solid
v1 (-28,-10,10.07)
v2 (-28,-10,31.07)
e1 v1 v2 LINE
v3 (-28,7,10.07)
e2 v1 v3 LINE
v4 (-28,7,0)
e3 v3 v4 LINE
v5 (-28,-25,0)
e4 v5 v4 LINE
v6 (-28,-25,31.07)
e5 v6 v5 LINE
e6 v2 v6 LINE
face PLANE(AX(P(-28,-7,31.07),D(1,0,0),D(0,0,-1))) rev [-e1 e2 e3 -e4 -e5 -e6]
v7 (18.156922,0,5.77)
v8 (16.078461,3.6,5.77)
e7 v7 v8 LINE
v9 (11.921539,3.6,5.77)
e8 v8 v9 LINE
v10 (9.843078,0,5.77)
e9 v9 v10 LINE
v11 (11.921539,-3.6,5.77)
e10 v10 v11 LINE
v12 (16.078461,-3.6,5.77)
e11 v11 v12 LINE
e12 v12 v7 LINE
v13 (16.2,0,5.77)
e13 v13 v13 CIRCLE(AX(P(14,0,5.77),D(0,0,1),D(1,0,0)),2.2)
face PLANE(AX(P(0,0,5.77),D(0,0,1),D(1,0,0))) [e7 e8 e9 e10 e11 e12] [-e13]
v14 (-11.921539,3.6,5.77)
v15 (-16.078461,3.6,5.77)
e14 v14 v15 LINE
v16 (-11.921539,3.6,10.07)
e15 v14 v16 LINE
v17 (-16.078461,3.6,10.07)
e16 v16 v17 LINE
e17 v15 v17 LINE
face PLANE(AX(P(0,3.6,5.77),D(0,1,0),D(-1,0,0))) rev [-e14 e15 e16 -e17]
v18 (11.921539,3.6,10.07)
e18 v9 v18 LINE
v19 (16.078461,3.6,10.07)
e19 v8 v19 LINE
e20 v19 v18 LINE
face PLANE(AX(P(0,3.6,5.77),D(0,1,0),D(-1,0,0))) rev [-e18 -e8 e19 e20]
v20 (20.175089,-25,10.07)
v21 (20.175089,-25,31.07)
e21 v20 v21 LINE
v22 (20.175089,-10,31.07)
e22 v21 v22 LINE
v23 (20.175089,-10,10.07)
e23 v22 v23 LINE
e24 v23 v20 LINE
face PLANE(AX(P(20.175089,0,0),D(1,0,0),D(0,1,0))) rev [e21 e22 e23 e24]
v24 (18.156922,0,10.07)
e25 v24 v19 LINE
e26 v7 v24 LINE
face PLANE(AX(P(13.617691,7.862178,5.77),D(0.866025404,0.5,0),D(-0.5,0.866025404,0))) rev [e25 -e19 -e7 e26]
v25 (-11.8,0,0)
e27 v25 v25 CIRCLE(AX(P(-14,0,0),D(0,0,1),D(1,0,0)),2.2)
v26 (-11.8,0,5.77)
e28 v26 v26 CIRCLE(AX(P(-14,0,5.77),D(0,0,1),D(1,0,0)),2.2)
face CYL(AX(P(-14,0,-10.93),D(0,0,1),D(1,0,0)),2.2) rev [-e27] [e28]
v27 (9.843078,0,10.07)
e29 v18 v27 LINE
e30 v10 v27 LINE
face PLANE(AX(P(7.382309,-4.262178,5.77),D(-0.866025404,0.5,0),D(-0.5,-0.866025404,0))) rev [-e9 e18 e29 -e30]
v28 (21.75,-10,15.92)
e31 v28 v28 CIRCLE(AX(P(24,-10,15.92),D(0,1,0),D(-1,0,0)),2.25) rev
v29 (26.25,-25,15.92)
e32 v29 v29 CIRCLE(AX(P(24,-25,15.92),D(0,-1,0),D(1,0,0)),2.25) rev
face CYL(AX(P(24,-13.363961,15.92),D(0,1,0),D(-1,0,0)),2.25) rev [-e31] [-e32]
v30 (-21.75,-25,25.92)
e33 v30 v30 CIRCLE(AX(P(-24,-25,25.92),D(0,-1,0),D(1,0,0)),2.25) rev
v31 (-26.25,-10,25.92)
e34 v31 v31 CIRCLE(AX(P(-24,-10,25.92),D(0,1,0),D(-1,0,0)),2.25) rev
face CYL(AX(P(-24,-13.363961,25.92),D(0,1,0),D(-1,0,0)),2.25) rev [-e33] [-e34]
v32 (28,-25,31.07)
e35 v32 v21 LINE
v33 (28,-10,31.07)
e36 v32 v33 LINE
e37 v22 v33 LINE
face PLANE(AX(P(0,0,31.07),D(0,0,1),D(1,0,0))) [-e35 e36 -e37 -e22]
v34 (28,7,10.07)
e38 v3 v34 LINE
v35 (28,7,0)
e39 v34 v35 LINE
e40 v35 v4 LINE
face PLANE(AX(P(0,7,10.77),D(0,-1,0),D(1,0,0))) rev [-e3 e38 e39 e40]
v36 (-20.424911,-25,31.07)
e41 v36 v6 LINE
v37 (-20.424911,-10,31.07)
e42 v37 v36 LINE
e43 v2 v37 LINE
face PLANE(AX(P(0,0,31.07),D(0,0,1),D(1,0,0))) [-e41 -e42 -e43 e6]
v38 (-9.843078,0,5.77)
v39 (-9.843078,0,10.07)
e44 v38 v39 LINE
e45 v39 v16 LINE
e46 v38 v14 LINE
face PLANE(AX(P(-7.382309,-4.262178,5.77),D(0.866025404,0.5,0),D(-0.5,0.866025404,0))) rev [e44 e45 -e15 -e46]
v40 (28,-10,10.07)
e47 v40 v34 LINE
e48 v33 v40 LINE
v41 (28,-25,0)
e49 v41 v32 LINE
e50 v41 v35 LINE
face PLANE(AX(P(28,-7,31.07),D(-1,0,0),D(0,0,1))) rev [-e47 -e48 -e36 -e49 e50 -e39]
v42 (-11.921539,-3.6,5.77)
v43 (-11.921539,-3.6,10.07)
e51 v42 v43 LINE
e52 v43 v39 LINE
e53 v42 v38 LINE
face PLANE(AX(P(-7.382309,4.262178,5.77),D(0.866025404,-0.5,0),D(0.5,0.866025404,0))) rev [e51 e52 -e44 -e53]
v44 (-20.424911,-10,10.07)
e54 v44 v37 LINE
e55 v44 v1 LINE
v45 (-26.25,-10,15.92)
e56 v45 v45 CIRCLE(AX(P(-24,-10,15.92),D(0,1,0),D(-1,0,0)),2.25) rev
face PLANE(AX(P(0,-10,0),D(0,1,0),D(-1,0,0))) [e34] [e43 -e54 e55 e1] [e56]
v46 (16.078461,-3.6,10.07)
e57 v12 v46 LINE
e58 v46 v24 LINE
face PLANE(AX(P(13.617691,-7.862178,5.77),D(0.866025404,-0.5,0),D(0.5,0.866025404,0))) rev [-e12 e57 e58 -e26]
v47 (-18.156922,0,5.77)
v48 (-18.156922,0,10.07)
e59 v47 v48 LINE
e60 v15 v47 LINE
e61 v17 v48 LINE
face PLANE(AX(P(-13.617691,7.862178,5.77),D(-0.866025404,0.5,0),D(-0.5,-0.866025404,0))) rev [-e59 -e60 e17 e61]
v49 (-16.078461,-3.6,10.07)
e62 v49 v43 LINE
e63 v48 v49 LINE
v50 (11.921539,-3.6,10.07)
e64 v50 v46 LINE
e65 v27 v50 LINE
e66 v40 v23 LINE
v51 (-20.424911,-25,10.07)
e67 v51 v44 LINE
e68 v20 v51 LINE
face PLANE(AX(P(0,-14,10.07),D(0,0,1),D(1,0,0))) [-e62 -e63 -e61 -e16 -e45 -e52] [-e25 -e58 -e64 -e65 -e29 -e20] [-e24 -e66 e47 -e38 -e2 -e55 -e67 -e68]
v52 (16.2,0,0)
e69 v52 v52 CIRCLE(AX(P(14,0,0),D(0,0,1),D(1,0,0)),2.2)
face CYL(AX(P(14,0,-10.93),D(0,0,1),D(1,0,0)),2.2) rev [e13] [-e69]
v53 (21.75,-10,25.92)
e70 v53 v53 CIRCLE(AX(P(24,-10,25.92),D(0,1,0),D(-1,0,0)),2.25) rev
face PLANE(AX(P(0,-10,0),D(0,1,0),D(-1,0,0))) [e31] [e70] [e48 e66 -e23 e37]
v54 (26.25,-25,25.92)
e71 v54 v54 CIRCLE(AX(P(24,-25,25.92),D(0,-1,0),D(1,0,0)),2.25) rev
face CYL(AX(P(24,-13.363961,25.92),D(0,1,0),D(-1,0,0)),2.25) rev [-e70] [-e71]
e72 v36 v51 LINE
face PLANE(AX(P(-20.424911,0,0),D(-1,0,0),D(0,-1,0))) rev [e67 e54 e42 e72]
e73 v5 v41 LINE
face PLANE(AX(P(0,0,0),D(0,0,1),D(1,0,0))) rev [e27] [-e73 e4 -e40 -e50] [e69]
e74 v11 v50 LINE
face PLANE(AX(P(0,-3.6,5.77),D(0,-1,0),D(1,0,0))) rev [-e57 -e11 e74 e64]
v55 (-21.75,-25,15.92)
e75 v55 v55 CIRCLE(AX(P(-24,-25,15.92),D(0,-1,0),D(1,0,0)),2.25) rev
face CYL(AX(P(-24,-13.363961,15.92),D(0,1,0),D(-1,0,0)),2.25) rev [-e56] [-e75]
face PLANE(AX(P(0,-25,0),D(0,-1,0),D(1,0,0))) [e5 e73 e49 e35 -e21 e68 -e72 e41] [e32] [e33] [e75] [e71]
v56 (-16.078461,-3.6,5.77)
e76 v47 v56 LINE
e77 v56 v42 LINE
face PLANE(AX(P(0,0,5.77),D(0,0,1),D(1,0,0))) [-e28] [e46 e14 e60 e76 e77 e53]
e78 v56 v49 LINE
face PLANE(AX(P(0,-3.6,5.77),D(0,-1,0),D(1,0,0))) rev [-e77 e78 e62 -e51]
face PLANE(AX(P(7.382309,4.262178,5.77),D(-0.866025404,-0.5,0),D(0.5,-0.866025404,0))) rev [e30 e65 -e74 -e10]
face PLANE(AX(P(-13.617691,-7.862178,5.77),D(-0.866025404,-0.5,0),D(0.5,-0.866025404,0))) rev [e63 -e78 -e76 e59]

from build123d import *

# Parameters (mm, degrees)
SZKIC1_W                       = 40
SZKIC1_H                       = 14
SZKIC1_R                       = 2
DODANIE_WYCI_GNI_CIE1_DEPTH    = 10.77
SZKIC2_W                       = 56
SZKIC2_H                       = 14
DODANIE_WYCI_GNI_CIE2_DEPTH    = 20.3
SZKIC5_R                       = 2.25
WYTNIJ_WYCI_GNI_CIE2_DEPTH     = 14
SZKIC8_W                       = 56
SZKIC8_H                       = 10.77
DODANIE_WYCI_GNI_CIE3_DEPTH    = 14
WYTNIJ_WYCI_GNI_CIE3_START     = -14
WYTNIJ_WYCI_GNI_CIE3_OUTLINE_W = 42
WYTNIJ_WYCI_GNI_CIE3_OUTLINE_H = 21
WYTNIJ_WYCI_GNI_CIE3_DEPTH     = 14
SZKIC12_R                      = 2.25
DODANIE_WYCI_GNI_CIE4_DEPTH    = 18
WYTNIJ_WYCI_GNI_CIE1_DEPTH     = 5
SZKIC9_R                       = 2.2
WYTNIJ_WYCI_GNI_CIE4_DEPTH     = 21
SZKIC10_W                      = 56
SZKIC10_H                      = 21
WYTNIJ_WYCI_GNI_CIE5_DEPTH     = 17
SZKIC13_W                      = 21
SZKIC13_H                      = 15
DODANIE_WYCI_GNI_CIE5_DEPTH    = 0.7
SZKIC16_W                      = 21
SZKIC16_H                      = 15
DODANIE_WYCI_GNI_CIE7_DEPTH    = 0.7


# Read off the part's stored shape, not the designer's step: Wytnij-wyciągnięcie3
with BuildPart() as part:
    # Szkic1 → Dodanie-wyciągnięcie1 (new body)
    with BuildSketch(Plane.XY):
        Rectangle(SZKIC1_W, SZKIC1_H)
        with Locations((-14, 0)):
            Circle(SZKIC1_R, mode=Mode.SUBTRACT)
        with Locations((14, 0)):
            Circle(SZKIC1_R, mode=Mode.SUBTRACT)
    extrude(amount=DODANIE_WYCI_GNI_CIE1_DEPTH)

    # Szkic2 → Dodanie-wyciągnięcie2 (add)
    with BuildSketch(Plane.XY.offset(10.77)):
        Rectangle(SZKIC2_W, SZKIC2_H)
    extrude(amount=DODANIE_WYCI_GNI_CIE2_DEPTH)

    # Szkic5 → Wytnij-wyciągnięcie2 (cut)
    with BuildSketch(Plane(origin=(0, 7, 0), x_dir=(1, 0, 0), z_dir=(0, 1, 0))):
        with Locations(Location((-24, -15.92, 0), (0, 0, 180))):
            Circle(SZKIC5_R)
        with Locations(Location((24, -15.92, 0), (0, 0, 180))):
            Circle(SZKIC5_R)
        with Locations(Location((24, -25.92, 0), (0, 0, 180))):
            Circle(SZKIC5_R)
        with Locations(Location((-24, -25.92, 0), (0, 0, 180))):
            Circle(SZKIC5_R)
    extrude(amount=-WYTNIJ_WYCI_GNI_CIE2_DEPTH, mode=Mode.SUBTRACT)

    # Szkic8 → Dodanie-wyciągnięcie3 (add)
    with BuildSketch(Plane(origin=(0, 7, 0), x_dir=(1, 0, 0), z_dir=(0, 1, 0))):
        with Locations((0, -5.385)):
            Rectangle(SZKIC8_W, SZKIC8_H)
    extrude(amount=-DODANIE_WYCI_GNI_CIE3_DEPTH)

    # Wytnij-wyciągnięcie3 outline → Wytnij-wyciągnięcie3 (cut)
    with BuildSketch(Plane(origin=(0, 7, 0), x_dir=(1, 0, 0), z_dir=(0, 1, 0)).offset(WYTNIJ_WYCI_GNI_CIE3_START)):
        with Locations((-0.124911353, -20.57)):
            Rectangle(WYTNIJ_WYCI_GNI_CIE3_OUTLINE_W, WYTNIJ_WYCI_GNI_CIE3_OUTLINE_H)
    extrude(amount=WYTNIJ_WYCI_GNI_CIE3_DEPTH, mode=Mode.SUBTRACT)

    # Szkic12 → Dodanie-wyciągnięcie4 (add)
    with BuildSketch(Plane.XZ.offset(7)):
        Polygon((20.875088647, 31.07), (20.875088647, 10.07), (-21.124911353, 10.07), (-21.124911353, 31.07), (-28, 31.07), (-28, 0), (28, 0), (28, 31.07), align=None)
        with Locations(Location((-24, 25.92, 0), (0, 0, 180))):
            Circle(SZKIC12_R, mode=Mode.SUBTRACT)
        with Locations(Location((24, 25.92, 0), (0, 0, 180))):
            Circle(SZKIC12_R, mode=Mode.SUBTRACT)
        with Locations(Location((-24, 15.92, 0), (0, 0, 180))):
            Circle(SZKIC12_R, mode=Mode.SUBTRACT)
        with Locations(Location((24, 15.92, 0), (0, 0, 180))):
            Circle(SZKIC12_R, mode=Mode.SUBTRACT)
    extrude(amount=DODANIE_WYCI_GNI_CIE4_DEPTH)

    # Szkic4 → Wytnij-wyciągnięcie1 (cut)
    with BuildSketch(Plane.XY.offset(10.77)):
        Polygon((-16.078460969, 3.6), (-18.156921938, 0), (-16.078460969, -3.6), (-11.921539031, -3.6), (-9.843078062, 0), (-11.921539031, 3.6), align=None)
        Polygon((11.921539031, 3.6), (9.843078062, 0), (11.921539031, -3.6), (16.078460969, -3.6), (18.156921938, 0), (16.078460969, 3.6), align=None)
    extrude(amount=-WYTNIJ_WYCI_GNI_CIE1_DEPTH, mode=Mode.SUBTRACT)

    # Szkic9 → Wytnij-wyciągnięcie4 (cut)
    with BuildSketch(Plane.XY.offset(10.07)):
        with Locations((-14, 0)):
            Circle(SZKIC9_R)
        with Locations((14, 0)):
            Circle(SZKIC9_R)
    extrude(amount=-WYTNIJ_WYCI_GNI_CIE4_DEPTH, mode=Mode.SUBTRACT)

    # Szkic10 → Wytnij-wyciągnięcie5 (cut)
    with BuildSketch(Plane(origin=(0, 7, 0), x_dir=(1, 0, 0), z_dir=(0, 1, 0))):
        with Locations((0, -20.57)):
            Rectangle(SZKIC10_W, SZKIC10_H)
    extrude(amount=-WYTNIJ_WYCI_GNI_CIE5_DEPTH, mode=Mode.SUBTRACT)

    # Szkic13 → Dodanie-wyciągnięcie5 (add)
    with BuildSketch(Plane(origin=(-21.124911353, 0, 0), x_dir=(0, 0, -1), z_dir=(1, 0, 0))):
        with Locations((-20.57, -17.5)):
            Rectangle(SZKIC13_W, SZKIC13_H)
    extrude(amount=DODANIE_WYCI_GNI_CIE5_DEPTH)

    # Szkic16 → Dodanie-wyciągnięcie7 (add)
    with BuildSketch(Plane.ZY.offset(-20.875088647)):
        with Locations((20.57, -17.5)):
            Rectangle(SZKIC16_W, SZKIC16_H)
    extrude(amount=DODANIE_WYCI_GNI_CIE7_DEPTH)


solid = part.part
